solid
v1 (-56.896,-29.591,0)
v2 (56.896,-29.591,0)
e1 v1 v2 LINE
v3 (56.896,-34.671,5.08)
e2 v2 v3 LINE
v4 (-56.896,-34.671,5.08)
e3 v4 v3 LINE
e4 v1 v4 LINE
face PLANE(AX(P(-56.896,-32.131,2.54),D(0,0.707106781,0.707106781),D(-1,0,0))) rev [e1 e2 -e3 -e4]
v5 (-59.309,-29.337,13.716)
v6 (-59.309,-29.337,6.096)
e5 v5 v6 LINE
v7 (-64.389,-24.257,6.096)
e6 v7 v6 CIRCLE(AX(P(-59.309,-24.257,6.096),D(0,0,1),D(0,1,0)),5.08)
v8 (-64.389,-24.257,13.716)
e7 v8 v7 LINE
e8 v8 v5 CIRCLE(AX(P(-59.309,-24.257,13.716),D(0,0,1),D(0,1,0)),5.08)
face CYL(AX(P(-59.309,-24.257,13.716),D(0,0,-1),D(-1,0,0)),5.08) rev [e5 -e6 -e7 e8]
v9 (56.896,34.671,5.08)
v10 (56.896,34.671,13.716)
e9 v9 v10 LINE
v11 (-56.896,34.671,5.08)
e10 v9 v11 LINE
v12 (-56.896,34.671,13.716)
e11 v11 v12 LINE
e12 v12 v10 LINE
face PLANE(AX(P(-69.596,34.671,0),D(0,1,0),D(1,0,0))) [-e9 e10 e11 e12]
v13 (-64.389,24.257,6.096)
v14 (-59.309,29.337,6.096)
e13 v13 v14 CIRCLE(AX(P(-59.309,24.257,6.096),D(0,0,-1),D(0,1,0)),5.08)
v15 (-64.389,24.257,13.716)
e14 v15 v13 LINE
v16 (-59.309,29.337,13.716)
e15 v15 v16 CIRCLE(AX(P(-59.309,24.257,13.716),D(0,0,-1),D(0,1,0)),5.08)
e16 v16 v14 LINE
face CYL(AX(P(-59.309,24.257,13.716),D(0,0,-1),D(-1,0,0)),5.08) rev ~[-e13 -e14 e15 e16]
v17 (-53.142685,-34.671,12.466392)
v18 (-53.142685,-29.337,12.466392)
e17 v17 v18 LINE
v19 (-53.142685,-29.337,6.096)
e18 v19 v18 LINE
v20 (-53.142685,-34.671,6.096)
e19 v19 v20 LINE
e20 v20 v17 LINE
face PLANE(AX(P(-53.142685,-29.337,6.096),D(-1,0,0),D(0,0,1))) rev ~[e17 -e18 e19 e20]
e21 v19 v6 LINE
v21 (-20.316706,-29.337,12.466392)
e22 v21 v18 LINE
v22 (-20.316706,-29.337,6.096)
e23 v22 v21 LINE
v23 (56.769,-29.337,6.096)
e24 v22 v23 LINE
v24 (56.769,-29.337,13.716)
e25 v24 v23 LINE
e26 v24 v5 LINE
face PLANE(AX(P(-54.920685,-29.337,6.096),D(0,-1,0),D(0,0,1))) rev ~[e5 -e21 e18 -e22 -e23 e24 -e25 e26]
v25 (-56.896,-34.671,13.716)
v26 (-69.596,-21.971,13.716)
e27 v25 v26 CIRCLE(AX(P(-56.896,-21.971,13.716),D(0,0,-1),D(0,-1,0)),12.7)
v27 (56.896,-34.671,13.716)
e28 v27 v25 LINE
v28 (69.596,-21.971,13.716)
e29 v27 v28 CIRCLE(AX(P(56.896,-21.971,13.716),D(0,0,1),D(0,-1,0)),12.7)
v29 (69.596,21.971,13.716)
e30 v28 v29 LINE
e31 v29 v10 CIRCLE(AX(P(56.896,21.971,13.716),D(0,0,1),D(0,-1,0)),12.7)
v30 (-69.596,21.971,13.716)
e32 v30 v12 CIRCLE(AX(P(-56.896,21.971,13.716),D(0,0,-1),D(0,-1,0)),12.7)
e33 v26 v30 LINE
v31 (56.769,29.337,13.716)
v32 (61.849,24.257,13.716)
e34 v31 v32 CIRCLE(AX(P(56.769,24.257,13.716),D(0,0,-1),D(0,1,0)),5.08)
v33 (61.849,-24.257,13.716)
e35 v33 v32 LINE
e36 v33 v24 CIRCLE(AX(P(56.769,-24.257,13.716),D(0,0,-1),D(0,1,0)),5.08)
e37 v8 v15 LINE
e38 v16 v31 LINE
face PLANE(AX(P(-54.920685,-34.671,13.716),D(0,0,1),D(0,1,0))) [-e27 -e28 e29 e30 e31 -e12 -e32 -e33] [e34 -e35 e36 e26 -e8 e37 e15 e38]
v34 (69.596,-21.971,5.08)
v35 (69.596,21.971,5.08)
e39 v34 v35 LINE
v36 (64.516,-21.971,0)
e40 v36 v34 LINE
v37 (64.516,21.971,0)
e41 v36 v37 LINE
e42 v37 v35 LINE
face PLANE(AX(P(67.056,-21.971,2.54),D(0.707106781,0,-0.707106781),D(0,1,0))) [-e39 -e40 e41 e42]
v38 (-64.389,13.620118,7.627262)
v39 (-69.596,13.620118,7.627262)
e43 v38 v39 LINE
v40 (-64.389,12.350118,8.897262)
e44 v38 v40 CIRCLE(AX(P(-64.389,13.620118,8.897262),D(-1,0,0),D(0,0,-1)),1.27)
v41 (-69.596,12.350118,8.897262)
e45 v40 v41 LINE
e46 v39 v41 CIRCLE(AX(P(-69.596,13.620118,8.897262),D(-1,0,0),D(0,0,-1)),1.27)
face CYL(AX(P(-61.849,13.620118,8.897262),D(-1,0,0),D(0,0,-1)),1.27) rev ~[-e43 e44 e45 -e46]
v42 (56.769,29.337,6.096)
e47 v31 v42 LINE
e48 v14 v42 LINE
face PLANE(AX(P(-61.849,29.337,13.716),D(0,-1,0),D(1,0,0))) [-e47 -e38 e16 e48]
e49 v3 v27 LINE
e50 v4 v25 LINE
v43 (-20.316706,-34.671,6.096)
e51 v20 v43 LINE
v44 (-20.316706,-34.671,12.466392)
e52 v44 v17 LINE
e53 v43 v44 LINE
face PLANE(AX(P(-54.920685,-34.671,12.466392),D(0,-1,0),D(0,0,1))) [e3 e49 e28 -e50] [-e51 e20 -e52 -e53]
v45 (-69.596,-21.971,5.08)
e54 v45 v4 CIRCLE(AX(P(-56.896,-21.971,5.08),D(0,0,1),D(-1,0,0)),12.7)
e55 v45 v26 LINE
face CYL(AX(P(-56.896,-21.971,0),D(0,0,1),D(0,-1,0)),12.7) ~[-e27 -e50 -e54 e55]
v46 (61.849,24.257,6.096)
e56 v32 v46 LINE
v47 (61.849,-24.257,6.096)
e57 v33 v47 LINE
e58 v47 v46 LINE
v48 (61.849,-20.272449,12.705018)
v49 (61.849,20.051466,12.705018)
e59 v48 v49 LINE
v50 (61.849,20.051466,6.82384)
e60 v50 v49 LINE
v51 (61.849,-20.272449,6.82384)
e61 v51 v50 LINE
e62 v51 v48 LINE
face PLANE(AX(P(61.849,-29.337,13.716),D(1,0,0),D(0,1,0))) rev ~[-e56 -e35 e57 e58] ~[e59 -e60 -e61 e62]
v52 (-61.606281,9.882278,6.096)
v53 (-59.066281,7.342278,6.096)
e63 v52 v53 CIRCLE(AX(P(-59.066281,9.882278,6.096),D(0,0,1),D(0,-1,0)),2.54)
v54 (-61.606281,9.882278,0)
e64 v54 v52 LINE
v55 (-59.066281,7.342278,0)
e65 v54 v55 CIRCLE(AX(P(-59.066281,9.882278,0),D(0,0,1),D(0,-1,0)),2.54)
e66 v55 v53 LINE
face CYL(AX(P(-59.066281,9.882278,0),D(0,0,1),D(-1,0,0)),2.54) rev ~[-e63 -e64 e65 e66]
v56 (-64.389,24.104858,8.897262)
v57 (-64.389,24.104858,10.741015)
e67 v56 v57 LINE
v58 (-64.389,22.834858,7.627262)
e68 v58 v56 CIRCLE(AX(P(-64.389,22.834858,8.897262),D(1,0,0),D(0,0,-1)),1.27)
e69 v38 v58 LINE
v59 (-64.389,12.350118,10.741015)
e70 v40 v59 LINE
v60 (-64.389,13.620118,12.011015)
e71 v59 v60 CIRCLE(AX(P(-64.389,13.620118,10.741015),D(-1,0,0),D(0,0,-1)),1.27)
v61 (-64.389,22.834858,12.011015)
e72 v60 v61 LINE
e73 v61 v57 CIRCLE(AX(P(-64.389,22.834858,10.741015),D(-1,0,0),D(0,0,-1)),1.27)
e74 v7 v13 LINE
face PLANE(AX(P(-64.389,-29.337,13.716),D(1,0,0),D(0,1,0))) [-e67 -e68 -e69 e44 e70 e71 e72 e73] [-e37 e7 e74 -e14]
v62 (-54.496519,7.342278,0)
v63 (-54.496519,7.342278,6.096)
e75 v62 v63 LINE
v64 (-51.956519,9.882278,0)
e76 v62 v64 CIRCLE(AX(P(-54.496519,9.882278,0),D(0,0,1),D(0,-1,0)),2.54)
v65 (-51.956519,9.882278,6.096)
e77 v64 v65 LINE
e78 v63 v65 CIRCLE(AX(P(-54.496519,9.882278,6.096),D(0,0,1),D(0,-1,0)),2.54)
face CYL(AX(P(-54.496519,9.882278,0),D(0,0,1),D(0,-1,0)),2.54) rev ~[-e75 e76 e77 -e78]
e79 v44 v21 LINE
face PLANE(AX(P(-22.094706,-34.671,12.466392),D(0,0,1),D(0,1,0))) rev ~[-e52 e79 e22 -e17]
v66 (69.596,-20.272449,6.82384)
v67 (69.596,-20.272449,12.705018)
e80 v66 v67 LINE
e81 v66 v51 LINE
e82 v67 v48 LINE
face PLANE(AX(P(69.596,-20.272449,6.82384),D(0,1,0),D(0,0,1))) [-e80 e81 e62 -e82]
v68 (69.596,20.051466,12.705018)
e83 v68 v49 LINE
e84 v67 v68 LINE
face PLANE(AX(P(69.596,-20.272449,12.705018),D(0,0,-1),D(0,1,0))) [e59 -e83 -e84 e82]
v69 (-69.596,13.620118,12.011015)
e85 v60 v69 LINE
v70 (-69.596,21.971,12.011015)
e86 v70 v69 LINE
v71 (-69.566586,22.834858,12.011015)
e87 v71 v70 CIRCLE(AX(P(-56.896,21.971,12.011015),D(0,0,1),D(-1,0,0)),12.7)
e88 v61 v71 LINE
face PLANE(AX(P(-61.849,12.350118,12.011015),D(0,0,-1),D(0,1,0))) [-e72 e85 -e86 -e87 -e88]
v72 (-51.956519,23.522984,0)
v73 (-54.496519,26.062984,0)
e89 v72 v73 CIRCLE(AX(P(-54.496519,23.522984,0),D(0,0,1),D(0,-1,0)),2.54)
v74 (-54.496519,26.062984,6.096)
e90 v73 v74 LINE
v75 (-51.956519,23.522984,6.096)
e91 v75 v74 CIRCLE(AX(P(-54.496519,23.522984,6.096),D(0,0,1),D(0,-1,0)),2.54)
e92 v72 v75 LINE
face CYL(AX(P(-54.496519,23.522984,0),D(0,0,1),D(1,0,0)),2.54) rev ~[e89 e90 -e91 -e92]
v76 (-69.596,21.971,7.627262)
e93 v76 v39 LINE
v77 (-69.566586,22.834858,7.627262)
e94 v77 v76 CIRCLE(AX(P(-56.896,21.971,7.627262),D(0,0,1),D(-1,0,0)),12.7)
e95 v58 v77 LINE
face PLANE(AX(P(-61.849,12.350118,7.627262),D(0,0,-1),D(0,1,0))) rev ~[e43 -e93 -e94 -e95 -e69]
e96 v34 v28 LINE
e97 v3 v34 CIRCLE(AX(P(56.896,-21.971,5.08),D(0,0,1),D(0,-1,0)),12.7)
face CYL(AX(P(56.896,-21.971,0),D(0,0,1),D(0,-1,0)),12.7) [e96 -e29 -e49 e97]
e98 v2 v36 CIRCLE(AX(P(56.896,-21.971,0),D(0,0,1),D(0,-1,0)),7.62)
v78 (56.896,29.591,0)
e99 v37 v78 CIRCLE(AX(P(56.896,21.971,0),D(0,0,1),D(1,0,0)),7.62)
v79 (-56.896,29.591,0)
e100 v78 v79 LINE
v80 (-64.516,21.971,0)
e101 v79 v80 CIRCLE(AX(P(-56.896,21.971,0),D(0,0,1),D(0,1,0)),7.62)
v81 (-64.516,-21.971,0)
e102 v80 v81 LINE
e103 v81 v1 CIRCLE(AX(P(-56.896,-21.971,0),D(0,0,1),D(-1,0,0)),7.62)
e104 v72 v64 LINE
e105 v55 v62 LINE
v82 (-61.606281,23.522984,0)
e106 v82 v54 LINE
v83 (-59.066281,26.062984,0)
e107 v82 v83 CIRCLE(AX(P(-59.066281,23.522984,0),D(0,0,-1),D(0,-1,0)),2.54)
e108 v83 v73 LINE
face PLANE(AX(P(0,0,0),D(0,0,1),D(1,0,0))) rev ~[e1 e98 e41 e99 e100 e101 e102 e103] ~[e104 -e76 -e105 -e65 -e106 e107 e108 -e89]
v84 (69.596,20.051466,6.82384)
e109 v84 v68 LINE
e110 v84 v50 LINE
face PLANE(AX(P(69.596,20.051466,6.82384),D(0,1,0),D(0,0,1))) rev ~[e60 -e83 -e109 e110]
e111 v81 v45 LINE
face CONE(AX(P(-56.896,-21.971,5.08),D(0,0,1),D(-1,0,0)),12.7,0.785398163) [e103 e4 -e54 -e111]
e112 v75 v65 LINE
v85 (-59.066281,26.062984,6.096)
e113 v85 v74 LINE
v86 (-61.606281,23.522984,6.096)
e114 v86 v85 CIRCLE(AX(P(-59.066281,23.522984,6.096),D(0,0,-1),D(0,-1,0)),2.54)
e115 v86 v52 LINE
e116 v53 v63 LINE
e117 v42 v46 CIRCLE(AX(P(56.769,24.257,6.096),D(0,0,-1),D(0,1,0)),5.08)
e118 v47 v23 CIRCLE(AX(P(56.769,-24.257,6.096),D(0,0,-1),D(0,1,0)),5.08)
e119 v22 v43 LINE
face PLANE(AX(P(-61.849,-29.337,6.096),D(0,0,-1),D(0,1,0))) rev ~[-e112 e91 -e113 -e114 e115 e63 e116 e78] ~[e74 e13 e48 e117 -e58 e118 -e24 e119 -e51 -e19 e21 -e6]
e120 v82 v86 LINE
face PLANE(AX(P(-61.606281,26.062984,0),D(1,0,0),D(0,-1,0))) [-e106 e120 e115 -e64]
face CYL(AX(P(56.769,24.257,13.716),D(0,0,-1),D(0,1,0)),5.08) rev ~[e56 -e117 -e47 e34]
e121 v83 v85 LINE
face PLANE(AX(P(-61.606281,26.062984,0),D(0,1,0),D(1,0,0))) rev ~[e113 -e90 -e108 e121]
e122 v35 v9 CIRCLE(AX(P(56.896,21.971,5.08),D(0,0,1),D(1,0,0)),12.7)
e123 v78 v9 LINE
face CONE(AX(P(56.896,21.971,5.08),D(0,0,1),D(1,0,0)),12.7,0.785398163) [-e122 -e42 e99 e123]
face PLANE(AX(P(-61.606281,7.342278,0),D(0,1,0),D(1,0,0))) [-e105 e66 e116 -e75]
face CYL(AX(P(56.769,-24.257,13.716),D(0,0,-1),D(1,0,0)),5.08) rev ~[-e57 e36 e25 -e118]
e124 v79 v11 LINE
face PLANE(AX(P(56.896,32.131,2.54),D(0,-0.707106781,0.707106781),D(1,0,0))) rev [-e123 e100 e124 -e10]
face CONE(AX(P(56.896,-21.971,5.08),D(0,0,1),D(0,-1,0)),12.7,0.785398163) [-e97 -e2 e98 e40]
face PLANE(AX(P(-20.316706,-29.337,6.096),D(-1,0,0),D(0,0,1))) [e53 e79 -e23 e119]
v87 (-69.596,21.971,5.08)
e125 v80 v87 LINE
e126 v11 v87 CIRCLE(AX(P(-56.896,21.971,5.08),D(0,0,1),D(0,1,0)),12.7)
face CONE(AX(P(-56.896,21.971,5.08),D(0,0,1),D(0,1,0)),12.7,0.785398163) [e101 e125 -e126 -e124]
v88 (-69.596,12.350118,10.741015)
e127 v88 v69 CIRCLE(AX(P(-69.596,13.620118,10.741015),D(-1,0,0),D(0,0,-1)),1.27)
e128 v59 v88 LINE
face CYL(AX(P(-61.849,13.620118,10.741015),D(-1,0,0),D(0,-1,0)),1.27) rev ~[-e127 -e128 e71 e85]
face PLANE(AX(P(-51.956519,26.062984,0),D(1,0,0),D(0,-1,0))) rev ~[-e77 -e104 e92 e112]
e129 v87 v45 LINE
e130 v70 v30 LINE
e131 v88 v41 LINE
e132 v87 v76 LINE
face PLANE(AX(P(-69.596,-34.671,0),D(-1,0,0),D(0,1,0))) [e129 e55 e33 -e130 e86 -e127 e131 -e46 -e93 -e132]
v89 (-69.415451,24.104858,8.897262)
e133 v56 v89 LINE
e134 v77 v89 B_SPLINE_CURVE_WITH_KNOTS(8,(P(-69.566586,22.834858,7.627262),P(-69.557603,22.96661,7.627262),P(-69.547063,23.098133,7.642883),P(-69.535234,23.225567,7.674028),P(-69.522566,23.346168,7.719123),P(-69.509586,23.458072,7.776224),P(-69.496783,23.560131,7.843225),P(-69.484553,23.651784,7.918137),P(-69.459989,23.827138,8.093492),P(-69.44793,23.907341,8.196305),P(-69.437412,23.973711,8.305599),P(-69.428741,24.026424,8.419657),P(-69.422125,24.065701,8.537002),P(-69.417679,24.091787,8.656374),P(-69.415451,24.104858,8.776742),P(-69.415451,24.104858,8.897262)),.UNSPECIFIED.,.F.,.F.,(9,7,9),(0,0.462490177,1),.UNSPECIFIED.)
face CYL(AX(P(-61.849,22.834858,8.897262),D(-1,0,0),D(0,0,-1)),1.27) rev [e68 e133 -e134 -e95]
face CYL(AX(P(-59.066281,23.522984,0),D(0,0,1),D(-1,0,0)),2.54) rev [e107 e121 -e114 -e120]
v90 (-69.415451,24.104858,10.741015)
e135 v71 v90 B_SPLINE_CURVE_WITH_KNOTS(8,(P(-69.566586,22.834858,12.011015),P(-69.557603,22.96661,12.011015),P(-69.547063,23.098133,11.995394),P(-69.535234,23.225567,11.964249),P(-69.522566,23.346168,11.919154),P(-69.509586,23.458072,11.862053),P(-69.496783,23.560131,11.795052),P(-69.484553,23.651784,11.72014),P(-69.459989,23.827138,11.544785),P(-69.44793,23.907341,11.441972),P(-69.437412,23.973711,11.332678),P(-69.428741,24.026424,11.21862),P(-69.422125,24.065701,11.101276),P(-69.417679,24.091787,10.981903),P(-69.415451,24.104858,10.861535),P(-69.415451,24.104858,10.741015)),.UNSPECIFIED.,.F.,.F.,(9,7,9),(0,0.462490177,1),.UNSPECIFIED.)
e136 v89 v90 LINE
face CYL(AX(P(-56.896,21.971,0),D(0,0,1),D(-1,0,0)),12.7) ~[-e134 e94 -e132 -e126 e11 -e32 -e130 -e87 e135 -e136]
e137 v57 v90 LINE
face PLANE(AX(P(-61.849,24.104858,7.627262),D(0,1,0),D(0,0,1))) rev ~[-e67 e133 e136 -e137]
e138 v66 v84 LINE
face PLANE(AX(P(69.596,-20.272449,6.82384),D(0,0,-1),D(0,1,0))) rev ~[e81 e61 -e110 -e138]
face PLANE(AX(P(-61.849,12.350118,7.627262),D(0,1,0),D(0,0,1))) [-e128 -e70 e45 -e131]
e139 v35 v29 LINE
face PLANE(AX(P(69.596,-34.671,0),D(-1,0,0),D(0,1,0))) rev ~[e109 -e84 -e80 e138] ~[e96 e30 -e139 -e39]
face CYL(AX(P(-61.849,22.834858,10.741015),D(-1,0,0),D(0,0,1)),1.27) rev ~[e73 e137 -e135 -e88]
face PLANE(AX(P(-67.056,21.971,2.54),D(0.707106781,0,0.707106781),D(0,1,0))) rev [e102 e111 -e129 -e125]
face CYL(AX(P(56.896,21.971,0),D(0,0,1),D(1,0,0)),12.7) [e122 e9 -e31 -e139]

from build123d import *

# Parameters (mm, degrees)
F0_W      = 139.192
F0_H      = 69.342
F1_DEPTH  = 13.716
F2_W      = 123.698
F2_H      = 58.674
F3_DEPTH  = 7.62
F4_R      = 12.7
F5_R      = 12.7
F6_W      = 40.32391496
F6_H      = 5.8811781928
F7_DEPTH  = 25.4
F8_W      = 32.8259784728
F8_H      = 7.62
F9_DEPTH  = 25.4
F10_W     = 5.334
F10_H     = 1.2496084515
F11_DEPTH = 33.02
F12_W     = 9.6497610211
F12_H     = 18.7207064591
F13_DEPTH = 25.4
F14_R     = 2.54
F15_W     = 11.7547400296
F15_H     = 4.3837525882
F16_DEPTH = 25.4
F17_R     = 1.27
F18_SIZE  = 5.08
F19_DEPTH = 2.54
F20_R     = 5.08
F21_DEPTH = 1.778
F22_DEPTH = 1.778


with BuildPart() as f1:
    # F0 (on Top) → F1 (new body)
    with BuildSketch(Plane.XY):
        Rectangle(F0_W, F0_H)
    extrude(amount=F1_DEPTH)

    # F2 (on face) → F3 (cut)
    with BuildSketch(Plane.XY.offset(13.716)):
        Rectangle(F2_W, F2_H)
    extrude(amount=-F3_DEPTH, mode=Mode.SUBTRACT)

    # F4
    f4_edges = [f1.edges().sort_by_distance(p)[0] for p in [
        (69.596, -34.671, 6.858),
    ]]
    fillet(f4_edges, radius=F4_R)

    # F5
    f5_edges = [f1.edges().sort_by_distance(p)[0] for p in [
        (69.596, 34.671, 6.858),
        (-69.596, -34.671, 6.858),
        (-69.596, 34.671, 6.858),
    ]]
    fillet(f5_edges, radius=F5_R)

    # F6 (on face) → F7 (cut)
    with BuildSketch(Plane.YZ.offset(69.596)):
        with Locations((-0.1104911789, 9.7644287162)):
            Rectangle(F6_W, F6_H)
    extrude(amount=-F7_DEPTH, mode=Mode.SUBTRACT)

    # F8 (on face) → F9 (cut)
    with BuildSketch(Plane(origin=(0, -29.337, 0), x_dir=(-1, 0, 0), z_dir=(0, 1, 0))):
        with Locations((38.5076953098, 9.906)):
            Rectangle(F8_W, F8_H)
    extrude(amount=-F9_DEPTH, mode=Mode.SUBTRACT)

    # F10 (on face) → F11 (join)
    with BuildSketch(Plane.YZ.offset(-54.9206845462)):
        with Locations((-32.004, 13.0911957743)):
            Rectangle(F10_W, F10_H)
    extrude(amount=F11_DEPTH)

    # F12 (on face) → F13 (cut)
    with BuildSketch(Plane(origin=(0, 0, 0), x_dir=(1, 0, 0), z_dir=(0, 0, -1))):
        with Locations((-56.7813999951, -16.70263079)):
            Rectangle(F12_W, F12_H)
    extrude(amount=-F13_DEPTH, mode=Mode.SUBTRACT)

    # F14
    f14_edges = [f1.edges().sort_by_distance(p)[0] for p in [
        (-51.956519, 7.342278, 3.048),
        (-61.606281, 26.062984, 3.048),
        (-61.606281, 7.342278, 3.048),
        (-51.956519, 26.062984, 3.048),
    ]]
    fillet(f14_edges, radius=F14_R)

    # F15 (on face) → F16 (cut)
    with BuildSketch(Plane.YZ.offset(-61.849)):
        with Locations((18.2274878025, 9.8191385623)):
            Rectangle(F15_W, F15_H)
    extrude(amount=-F16_DEPTH, mode=Mode.SUBTRACT)

    # F17
    f17_edges = [f1.edges().sort_by_distance(p)[0] for p in [
        (-65.7225, 12.350118, 7.627262),
        (-65.7225, 12.350118, 12.011015),
        (-65.632225, 24.104858, 7.627262),
        (-65.632225, 24.104858, 12.011015),
    ]]
    fillet(f17_edges, radius=F17_R)

    # F18
    f18_edges = [f1.edges().sort_by_distance(p)[0] for p in [
        (0, -34.671, 0),
    ]]
    chamfer(f18_edges, length=F18_SIZE)

    # F19 (cut): a face of the model
    f19_faces = [f1.faces().sort_by_distance(p)[0] for p in [
        (-61.849, -2.3026136032, 9.916972896),
    ]]
    extrude(f19_faces, amount=-F19_DEPTH, mode=Mode.SUBTRACT)

    # F20
    f20_edges = [f1.edges().sort_by_distance(p)[0] for p in [
        (-64.389, -29.337, 9.906),
        (-64.389, 29.337, 9.906),
        (61.849, -29.337, 9.906),
        (61.849, 29.337, 9.906),
    ]]
    fillet(f20_edges, radius=F20_R)

    # F21 (add): a face of the model
    f21_faces = [f1.faces().sort_by_distance(p)[0] for p in [
        (-54.9206845462, -32.004, 9.2811957743),
    ]]
    extrude(f21_faces, amount=F21_DEPTH)

    # F22 (cut): a face of the model
    f22_faces = [f1.faces().sort_by_distance(p)[0] for p in [
        (-22.0947060734, -32.004, 9.2811957743),
    ]]
    extrude(f22_faces, amount=-F22_DEPTH, mode=Mode.SUBTRACT)


solid = f1.part
